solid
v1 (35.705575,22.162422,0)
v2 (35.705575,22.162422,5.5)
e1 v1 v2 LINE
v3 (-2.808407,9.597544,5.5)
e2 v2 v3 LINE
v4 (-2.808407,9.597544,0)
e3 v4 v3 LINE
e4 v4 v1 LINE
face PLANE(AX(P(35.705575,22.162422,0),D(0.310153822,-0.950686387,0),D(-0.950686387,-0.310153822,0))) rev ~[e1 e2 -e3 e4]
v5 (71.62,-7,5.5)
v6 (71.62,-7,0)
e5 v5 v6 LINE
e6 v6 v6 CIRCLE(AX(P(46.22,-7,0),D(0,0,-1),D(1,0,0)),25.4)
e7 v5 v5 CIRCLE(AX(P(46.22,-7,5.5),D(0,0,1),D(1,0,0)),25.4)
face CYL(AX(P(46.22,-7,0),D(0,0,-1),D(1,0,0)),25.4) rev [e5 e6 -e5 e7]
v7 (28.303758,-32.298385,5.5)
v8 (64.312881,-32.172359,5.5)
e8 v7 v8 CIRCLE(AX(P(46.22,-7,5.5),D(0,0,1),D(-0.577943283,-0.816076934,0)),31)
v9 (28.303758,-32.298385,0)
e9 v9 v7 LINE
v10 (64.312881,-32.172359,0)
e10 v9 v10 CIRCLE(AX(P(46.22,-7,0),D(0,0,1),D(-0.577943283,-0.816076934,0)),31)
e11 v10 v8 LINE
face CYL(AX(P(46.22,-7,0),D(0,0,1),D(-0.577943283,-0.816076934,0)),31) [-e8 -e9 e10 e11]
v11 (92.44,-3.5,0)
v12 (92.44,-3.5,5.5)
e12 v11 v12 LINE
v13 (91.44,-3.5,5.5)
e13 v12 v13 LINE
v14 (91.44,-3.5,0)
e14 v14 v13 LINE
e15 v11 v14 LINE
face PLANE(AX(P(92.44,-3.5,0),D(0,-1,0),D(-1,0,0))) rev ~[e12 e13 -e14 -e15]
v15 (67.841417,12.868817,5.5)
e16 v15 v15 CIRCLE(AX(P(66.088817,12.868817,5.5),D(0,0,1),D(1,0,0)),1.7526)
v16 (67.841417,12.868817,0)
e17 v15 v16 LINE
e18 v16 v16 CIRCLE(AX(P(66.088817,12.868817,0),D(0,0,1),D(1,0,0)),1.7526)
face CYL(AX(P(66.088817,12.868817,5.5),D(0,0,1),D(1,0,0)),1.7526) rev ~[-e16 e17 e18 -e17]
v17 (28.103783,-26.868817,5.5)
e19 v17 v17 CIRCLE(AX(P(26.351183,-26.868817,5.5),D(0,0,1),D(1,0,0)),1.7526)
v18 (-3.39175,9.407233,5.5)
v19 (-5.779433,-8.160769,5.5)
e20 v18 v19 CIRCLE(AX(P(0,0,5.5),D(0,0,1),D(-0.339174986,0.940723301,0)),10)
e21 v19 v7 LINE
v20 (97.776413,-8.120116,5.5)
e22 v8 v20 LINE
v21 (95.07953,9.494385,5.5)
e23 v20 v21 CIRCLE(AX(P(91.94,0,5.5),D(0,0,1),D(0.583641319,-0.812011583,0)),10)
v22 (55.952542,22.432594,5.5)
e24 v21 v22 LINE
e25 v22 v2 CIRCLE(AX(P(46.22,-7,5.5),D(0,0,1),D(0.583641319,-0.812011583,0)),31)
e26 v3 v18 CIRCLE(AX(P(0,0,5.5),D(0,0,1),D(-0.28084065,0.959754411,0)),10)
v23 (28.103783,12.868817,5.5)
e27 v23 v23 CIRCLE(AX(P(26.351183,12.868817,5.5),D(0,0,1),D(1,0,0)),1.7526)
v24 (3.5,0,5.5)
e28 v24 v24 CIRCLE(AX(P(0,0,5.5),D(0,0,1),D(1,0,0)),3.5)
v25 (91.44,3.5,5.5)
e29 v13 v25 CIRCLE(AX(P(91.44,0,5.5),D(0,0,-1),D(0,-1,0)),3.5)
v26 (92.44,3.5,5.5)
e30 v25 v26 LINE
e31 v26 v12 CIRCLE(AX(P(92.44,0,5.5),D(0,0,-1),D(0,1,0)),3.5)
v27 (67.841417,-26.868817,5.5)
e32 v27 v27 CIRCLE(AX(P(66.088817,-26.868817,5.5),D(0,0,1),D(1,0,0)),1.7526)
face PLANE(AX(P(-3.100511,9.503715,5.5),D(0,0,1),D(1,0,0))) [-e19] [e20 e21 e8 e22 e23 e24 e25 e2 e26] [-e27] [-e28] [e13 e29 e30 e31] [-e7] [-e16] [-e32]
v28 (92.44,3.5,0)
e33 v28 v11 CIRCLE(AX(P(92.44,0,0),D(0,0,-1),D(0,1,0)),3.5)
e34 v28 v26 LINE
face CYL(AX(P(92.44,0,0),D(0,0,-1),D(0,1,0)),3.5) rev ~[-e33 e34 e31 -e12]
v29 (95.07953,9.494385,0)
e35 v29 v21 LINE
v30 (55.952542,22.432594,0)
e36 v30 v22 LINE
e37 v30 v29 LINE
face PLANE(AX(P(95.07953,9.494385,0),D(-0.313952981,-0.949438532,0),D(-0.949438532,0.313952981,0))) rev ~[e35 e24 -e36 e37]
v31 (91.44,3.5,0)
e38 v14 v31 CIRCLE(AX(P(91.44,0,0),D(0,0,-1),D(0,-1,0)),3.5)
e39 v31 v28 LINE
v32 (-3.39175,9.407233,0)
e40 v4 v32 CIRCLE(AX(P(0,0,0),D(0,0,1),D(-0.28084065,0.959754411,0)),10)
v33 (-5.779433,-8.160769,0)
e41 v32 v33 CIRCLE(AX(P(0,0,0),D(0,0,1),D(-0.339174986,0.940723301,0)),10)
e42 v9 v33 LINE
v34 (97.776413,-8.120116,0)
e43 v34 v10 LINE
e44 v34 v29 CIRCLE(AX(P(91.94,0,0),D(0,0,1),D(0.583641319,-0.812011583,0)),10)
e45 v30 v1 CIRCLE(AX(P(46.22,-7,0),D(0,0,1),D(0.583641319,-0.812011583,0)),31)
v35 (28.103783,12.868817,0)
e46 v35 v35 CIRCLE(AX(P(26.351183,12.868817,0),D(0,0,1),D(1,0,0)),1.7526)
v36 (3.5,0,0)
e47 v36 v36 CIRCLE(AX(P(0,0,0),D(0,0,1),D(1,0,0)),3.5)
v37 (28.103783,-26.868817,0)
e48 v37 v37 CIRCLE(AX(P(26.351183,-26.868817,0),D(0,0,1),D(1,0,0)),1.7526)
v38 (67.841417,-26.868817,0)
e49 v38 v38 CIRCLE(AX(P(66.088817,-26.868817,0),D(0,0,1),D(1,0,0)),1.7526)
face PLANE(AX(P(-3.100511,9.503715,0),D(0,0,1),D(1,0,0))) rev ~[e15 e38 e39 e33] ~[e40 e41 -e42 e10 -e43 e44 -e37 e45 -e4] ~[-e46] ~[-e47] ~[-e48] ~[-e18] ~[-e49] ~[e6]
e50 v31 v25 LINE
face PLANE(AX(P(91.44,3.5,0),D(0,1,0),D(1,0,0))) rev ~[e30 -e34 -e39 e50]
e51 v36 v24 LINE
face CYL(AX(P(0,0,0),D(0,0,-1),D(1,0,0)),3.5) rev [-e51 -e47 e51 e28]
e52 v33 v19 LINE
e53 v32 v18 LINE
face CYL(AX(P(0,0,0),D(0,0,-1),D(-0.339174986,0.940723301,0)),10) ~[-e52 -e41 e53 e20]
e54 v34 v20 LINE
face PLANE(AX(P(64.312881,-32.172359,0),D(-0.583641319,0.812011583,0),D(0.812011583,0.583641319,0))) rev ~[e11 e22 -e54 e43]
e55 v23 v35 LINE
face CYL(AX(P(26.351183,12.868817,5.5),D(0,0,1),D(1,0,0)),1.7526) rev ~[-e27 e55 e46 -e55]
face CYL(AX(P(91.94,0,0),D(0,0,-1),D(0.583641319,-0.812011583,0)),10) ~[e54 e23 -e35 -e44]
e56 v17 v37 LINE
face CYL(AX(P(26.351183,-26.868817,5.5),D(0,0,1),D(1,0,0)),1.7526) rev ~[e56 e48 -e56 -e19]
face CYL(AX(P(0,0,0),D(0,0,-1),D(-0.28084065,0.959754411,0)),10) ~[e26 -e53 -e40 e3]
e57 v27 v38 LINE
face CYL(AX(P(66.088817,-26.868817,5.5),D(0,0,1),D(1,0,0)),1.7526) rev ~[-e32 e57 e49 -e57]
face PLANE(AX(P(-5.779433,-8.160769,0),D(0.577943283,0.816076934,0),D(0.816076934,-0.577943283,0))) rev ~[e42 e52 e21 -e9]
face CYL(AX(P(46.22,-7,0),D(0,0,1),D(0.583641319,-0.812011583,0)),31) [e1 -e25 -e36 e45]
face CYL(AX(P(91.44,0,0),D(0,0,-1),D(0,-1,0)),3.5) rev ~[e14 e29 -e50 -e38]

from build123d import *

# Parameters (mm, degrees)
F0_R      = 3.5
F0_R_2    = 25.4
F1_DEPTH  = 5.5
F2_DEPTH  = 33
F3_DEPTH  = 28
F4_R      = 2.5
F5_DEPTH  = 25.4
F6_R      = 5.08
F7_R      = 40.64
F8_DEPTH  = 33
F9_R      = 1.7526
F10_DEPTH = 5.501


with BuildPart() as f1:
    # F0 (on Top) → F1 (new body)
    with BuildSketch(Plane.XY):
        with BuildLine():
            Line((-3.3917498572, 9.4072330101), (-2.8084065037, 9.5975441082))
            ThreePointArc((-2.8084065037, 9.5975441082), (-3.1015382157, 9.5068638728), (-3.3917498572, 9.4072330101))
        make_face()
        with BuildLine():
            Line((35.7055754428, 22.1624223313), (-2.8084065037, 9.5975441082))
            Line((-2.8084065037, 9.5975441082), (-3.3917498572, 9.4072330101))
            ThreePointArc((-3.3917498572, 9.4072330101), (-9.9089012804, 1.3467276694), (-5.7794328291, -8.1607693371))
            Line((-5.7794328291, -8.1607693371), (28.3037582299, -32.2983849452))
            ThreePointArc((28.3037582299, -32.2983849452), (15.5024060308, -2.8251442248), (35.7055754428, 22.1624223313))
        make_face()
        Circle(F0_R, mode=Mode.SUBTRACT)
        with BuildLine():
            ThreePointArc((55.9525424009, 22.43259449), (45.80637798, 23.9972404711), (35.7055754428, 22.1624223313))
            ThreePointArc((35.7055754428, 22.1624223313), (15.5024060308, -2.8251442248), (28.3037582299, -32.2983849452))
            ThreePointArc((28.3037582299, -32.2983849452), (46.3284941146, -37.999810145), (64.3128808741, -32.1723590805))
            ThreePointArc((64.3128808741, -32.1723590805), (73.805134648, -21.1442690321), (77.22, -7))
            ThreePointArc((77.22, -7), (71.3467667481, 11.1561447666), (55.9525424009, 22.43259449))
        make_face()
        with Locations((46.22, -7)):
            Circle(F0_R_2, mode=Mode.SUBTRACT)
        with BuildLine():
            Line((95.0795298067, 9.4943853194), (55.9525424009, 22.43259449))
            ThreePointArc((55.9525424009, 22.43259449), (71.3467667481, 11.1561447666), (77.22, -7))
            ThreePointArc((77.22, -7), (73.805134648, -21.1442690321), (64.3128808741, -32.1723590805))
            Line((64.3128808741, -32.1723590805), (97.7764131852, -8.1201158324))
            ThreePointArc((97.7764131852, -8.1201158324), (101.8248141538, 1.5134229894), (95.0795298067, 9.4943853194))
        make_face()
        with BuildLine():
            ThreePointArc((91.44, -3.5), (87.94, 0), (91.44, 3.5))
            Line((91.44, 3.5), (92.44, 3.5))
            ThreePointArc((92.44, 3.5), (95.94, 0), (92.44, -3.5))
            Line((92.44, -3.5), (91.44, -3.5))
        make_face(mode=Mode.SUBTRACT)
    extrude(amount=F1_DEPTH)

    # F0 (on Top) → F2 (join)
    with BuildSketch(Plane.XY):
        with BuildLine():
            ThreePointArc((55.9525424009, 22.43259449), (45.80637798, 23.9972404711), (35.7055754428, 22.1624223313))
            ThreePointArc((35.7055754428, 22.1624223313), (15.5024060308, -2.8251442248), (28.3037582299, -32.2983849452))
            ThreePointArc((28.3037582299, -32.2983849452), (46.3284941146, -37.999810145), (64.3128808741, -32.1723590805))
            ThreePointArc((64.3128808741, -32.1723590805), (73.805134648, -21.1442690321), (77.22, -7))
            ThreePointArc((77.22, -7), (71.3467667481, 11.1561447666), (55.9525424009, 22.43259449))
        make_face()
        with Locations((46.22, -7)):
            Circle(F0_R_2, mode=Mode.SUBTRACT)
        with Locations((46.22, -7)):
            Circle(F0_R_2)
    extrude(amount=-F2_DEPTH)

    # F0 (on Top) → F3 (cut)
    with BuildSketch(Plane.XY):
        with Locations((46.22, -7)):
            Circle(F0_R_2)
    extrude(amount=-F3_DEPTH, mode=Mode.SUBTRACT)

    # F4 (on face) → F5 (cut)
    with BuildSketch(Plane(origin=(0, 0, -33), x_dir=(1, 0, 0), z_dir=(0, 0, -1))):
        with Locations((46.22, 7)):
            Circle(F4_R)
    extrude(amount=-F5_DEPTH, mode=Mode.SUBTRACT)

    # F6
    f6_edges = [f1.edges().sort_by_distance(p)[0] for p in [
        (36.487458, -36.432594, -33),
    ]]
    fillet(f6_edges, radius=F6_R)

    # F7 (on face) → F8 (cut, through all)
    with BuildSketch(Plane(origin=(0, 0, -33), x_dir=(1, 0, 0), z_dir=(0, 0, -1))):
        with Locations((46.22, 7)):
            Circle(F7_R)
    extrude(amount=-F8_DEPTH, mode=Mode.SUBTRACT)

    # F9 (on face) → F10 (cut, through all)
    with BuildSketch(Plane.XY.offset(5.5)):
        with Locations((26.3511833321, 12.8688166679)):
            Circle(F9_R)
        with Locations((26.3511833321, -26.8688166679)):
            Circle(F9_R)
        with Locations((66.0888166679, -26.8688166679)):
            Circle(F9_R)
        with Locations((66.0888166679, 12.8688166679)):
            Circle(F9_R)
    extrude(amount=-F10_DEPTH, mode=Mode.SUBTRACT)


solid = f1.part
